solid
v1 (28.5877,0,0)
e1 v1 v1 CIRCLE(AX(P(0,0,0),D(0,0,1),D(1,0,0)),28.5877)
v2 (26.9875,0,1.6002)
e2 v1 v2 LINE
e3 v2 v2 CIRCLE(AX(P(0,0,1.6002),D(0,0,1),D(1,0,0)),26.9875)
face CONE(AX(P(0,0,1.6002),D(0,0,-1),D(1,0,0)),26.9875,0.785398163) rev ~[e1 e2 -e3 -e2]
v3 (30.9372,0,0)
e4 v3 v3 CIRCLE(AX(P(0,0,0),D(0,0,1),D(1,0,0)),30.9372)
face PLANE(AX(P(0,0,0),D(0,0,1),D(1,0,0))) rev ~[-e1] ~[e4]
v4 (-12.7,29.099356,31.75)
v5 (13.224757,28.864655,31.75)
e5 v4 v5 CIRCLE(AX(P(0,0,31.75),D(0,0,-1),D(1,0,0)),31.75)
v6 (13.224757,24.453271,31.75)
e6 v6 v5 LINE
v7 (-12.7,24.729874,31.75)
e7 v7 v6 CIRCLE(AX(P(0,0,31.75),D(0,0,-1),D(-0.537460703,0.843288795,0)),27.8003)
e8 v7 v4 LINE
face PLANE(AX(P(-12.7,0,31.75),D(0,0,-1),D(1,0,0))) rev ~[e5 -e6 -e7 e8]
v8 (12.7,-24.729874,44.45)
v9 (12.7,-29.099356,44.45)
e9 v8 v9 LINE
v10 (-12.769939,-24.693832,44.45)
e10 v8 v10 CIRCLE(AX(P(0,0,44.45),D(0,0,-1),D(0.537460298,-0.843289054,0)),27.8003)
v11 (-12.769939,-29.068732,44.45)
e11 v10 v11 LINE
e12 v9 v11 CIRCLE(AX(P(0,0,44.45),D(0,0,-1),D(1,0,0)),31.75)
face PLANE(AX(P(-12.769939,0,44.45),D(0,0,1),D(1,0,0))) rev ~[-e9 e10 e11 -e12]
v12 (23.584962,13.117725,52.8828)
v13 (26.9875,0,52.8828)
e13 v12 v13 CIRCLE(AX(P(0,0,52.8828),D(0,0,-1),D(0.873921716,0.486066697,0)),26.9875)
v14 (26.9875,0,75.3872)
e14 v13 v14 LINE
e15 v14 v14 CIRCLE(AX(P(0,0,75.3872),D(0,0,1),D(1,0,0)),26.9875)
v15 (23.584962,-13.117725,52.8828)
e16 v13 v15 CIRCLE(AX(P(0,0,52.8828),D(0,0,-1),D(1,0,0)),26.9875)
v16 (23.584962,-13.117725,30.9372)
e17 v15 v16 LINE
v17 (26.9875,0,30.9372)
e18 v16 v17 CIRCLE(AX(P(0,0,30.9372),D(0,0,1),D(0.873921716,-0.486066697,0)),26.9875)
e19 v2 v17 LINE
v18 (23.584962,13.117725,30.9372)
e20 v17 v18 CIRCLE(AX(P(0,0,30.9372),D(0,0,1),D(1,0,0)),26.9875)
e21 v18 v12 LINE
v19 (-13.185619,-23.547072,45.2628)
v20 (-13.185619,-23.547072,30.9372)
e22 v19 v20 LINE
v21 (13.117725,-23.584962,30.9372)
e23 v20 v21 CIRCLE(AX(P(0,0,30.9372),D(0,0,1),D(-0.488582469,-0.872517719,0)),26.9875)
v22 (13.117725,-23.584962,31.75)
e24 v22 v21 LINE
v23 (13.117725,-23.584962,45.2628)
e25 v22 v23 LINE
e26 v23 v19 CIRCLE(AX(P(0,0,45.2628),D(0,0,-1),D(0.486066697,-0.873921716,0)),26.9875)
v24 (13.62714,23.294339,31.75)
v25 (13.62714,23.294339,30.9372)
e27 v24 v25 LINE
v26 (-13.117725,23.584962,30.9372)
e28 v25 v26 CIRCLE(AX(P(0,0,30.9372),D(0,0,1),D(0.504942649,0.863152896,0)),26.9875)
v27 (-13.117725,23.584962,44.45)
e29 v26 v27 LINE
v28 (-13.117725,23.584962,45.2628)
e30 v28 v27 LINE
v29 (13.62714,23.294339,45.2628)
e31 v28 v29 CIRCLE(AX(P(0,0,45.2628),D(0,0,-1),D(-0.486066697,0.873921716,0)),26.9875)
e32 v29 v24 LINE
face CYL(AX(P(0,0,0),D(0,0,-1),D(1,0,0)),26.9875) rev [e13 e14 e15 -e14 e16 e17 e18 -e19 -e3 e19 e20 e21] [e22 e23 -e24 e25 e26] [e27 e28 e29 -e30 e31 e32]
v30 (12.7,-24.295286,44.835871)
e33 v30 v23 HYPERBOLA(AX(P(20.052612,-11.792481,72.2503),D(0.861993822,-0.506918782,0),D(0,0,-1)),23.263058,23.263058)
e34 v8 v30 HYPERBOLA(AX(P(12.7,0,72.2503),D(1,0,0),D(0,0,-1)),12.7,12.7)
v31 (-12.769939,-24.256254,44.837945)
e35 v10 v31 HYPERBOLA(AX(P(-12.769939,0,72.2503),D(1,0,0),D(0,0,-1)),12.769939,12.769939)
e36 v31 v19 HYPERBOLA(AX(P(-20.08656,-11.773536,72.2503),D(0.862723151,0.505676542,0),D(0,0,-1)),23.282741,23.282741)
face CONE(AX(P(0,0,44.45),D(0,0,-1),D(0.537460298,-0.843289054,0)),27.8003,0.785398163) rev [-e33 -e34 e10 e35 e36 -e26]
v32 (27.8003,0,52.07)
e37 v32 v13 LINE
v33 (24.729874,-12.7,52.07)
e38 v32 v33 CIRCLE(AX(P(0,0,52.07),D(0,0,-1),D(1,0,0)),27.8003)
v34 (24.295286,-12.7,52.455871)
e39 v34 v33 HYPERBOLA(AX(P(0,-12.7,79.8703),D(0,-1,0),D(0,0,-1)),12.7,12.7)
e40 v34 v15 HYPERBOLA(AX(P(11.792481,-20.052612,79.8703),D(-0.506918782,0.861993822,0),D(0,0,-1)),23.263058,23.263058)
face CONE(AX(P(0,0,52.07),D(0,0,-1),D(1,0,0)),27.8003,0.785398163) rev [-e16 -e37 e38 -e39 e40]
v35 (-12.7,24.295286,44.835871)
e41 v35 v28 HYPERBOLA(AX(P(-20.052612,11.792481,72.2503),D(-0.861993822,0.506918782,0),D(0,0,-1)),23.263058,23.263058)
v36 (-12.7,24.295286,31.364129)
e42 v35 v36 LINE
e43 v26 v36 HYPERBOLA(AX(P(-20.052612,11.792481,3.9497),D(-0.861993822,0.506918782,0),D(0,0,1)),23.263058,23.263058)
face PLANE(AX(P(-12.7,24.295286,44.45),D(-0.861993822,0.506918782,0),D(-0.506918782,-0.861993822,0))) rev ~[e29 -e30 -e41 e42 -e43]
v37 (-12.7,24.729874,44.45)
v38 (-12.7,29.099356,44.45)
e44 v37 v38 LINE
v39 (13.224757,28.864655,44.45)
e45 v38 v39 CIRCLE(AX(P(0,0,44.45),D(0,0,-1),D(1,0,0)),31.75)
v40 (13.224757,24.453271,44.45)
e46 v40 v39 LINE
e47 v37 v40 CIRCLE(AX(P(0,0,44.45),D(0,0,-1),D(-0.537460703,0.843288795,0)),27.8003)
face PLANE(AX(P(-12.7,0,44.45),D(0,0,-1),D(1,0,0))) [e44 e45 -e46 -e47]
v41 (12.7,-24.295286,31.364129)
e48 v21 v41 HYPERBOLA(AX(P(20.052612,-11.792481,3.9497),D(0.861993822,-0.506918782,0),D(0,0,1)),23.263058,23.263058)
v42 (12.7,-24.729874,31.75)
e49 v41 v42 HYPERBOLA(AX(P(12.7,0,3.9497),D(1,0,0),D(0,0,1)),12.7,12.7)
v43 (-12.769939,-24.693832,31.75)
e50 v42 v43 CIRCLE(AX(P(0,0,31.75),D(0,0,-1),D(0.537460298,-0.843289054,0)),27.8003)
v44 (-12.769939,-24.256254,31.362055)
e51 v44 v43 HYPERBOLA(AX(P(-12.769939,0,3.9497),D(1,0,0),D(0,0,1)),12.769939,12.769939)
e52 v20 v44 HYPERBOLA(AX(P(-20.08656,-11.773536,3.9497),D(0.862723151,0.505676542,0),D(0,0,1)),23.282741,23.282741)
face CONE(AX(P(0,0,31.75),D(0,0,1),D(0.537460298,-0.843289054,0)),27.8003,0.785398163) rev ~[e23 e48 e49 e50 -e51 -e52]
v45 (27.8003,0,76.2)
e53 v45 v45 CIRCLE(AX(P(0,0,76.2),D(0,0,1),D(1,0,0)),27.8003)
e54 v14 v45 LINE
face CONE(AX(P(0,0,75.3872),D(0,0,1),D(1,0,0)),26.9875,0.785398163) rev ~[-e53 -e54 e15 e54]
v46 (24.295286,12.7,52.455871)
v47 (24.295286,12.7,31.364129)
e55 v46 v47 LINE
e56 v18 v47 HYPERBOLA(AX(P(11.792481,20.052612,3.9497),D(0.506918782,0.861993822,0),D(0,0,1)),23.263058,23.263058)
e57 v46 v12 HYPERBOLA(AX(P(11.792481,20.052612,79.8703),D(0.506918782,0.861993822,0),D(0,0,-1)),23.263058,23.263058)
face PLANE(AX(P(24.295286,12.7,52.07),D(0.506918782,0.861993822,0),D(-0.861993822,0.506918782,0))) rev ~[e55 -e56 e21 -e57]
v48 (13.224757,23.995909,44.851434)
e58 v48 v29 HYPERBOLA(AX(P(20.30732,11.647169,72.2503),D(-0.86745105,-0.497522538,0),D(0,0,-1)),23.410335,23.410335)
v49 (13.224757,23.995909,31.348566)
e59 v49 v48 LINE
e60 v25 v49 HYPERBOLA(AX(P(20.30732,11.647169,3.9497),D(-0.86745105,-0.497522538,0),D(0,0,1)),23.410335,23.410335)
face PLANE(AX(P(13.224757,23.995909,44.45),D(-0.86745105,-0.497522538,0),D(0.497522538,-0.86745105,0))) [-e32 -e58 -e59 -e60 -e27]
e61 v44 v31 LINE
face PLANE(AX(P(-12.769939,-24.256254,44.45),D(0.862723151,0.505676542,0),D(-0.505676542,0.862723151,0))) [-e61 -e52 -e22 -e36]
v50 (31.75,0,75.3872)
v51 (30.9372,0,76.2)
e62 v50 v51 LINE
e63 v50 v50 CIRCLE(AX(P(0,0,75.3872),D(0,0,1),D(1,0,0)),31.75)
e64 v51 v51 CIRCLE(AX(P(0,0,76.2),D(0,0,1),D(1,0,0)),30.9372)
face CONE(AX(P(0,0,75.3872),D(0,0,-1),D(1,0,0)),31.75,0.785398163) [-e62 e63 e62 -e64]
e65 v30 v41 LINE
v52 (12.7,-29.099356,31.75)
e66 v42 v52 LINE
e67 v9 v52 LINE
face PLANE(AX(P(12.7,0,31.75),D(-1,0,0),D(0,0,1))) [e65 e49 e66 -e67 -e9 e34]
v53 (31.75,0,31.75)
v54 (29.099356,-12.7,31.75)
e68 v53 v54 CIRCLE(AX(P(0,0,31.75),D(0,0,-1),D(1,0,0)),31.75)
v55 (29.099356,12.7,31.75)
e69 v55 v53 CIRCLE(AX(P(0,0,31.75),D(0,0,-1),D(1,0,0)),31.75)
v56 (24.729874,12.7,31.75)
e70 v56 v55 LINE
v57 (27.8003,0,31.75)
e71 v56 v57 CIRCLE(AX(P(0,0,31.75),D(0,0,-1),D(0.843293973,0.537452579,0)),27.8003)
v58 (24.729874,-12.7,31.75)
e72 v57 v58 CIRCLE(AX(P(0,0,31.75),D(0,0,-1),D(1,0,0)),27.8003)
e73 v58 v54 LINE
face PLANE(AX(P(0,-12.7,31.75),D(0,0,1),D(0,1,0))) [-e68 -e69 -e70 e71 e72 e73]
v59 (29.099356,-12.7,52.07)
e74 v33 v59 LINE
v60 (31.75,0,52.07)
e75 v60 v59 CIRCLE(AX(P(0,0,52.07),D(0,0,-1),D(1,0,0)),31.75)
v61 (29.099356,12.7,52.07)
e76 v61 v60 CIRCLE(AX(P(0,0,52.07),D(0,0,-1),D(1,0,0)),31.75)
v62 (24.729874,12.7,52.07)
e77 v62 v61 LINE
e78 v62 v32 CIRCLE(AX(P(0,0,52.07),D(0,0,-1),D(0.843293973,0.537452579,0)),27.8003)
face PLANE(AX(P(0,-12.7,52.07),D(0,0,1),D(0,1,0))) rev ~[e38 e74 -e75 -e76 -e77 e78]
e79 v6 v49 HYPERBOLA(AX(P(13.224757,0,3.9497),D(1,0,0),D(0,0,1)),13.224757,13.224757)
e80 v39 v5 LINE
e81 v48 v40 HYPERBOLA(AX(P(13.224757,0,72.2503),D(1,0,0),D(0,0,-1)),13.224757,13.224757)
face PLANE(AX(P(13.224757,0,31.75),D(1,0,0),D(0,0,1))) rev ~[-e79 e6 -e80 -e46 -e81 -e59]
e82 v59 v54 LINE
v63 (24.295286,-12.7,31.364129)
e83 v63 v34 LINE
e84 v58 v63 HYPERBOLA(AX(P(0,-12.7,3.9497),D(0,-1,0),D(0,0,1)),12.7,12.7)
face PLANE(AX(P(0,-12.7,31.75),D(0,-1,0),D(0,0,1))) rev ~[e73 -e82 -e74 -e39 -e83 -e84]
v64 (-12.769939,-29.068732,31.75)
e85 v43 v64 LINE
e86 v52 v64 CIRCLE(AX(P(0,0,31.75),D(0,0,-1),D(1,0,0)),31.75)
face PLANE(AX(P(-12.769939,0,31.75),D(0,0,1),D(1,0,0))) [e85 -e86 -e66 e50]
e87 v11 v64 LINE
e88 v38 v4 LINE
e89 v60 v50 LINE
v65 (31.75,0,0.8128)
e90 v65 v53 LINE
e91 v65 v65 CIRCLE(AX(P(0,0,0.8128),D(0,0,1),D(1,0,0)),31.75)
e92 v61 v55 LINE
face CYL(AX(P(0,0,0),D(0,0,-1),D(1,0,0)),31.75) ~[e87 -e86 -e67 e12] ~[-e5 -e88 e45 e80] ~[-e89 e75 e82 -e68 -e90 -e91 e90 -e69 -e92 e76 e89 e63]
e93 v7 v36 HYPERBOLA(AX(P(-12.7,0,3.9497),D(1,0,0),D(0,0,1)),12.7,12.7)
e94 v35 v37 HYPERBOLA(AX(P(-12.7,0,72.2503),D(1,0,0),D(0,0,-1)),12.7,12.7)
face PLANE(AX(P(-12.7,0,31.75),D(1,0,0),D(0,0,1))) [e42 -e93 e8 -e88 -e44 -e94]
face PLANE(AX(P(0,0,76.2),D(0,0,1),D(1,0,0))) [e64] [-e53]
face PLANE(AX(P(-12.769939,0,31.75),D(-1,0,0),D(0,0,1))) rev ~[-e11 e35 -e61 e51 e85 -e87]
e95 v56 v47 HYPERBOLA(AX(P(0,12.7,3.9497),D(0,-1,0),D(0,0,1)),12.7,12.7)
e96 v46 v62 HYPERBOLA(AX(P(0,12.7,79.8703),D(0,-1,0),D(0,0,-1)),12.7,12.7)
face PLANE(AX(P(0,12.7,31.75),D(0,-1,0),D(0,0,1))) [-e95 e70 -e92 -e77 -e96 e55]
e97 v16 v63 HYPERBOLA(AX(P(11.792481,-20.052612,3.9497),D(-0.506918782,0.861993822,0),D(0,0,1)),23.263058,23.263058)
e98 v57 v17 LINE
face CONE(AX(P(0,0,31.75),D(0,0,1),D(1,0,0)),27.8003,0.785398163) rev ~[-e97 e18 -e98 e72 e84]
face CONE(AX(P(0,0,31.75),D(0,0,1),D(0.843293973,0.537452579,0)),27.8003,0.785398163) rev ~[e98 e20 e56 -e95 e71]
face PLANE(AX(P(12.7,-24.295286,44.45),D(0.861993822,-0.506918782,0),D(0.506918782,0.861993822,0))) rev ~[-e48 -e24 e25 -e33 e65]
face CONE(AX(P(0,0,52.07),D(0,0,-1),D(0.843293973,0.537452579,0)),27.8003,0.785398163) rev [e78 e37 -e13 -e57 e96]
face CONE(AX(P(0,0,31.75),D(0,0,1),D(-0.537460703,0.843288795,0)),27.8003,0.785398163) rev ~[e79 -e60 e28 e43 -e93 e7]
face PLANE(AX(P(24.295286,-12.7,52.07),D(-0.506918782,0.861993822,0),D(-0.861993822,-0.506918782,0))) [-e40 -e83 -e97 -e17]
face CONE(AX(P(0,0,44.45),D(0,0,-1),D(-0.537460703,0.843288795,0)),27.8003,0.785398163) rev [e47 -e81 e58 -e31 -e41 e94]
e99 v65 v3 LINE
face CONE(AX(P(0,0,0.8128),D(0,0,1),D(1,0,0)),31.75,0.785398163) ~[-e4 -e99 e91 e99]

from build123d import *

# Parameters (mm, degrees)
F0_R          = 31.75
F0_R_2        = 26.9875
F1_DEPTH      = 76.2
F2_W          = 25.924757123
F2_H          = 12.7
F3_DEPTH      = 76.2
F4_W          = 25.4699392244
F4_H          = 12.7
F5_DEPTH      = 76.2
F6_W          = 25.4
F6_H          = 20.32
F7_DEPTH      = 76.2
F8_T1_DEPTH   = 20.32
F8_T3_DEPTH   = 12.7
F8_T8_ANGLE   = 32.5103926672
F8_T13_ANGLE  = 32.5103926672
F8_T18_ANGLE  = 32.5103926672
F8_T23_ANGLE  = 32.5103926672
F8_T28_ANGLE  = 66.292132353
F8_T34_ANGLE  = 66.292132353
F8_T40_ANGLE  = 65.190248715
F8_T46_ANGLE  = 65.190248715
F8_T53_ANGLE  = 32.5103926672
F8_T57_DEPTH  = 21.5976920802
F8_T64_ANGLE  = 32.5103926672
F8_T68_DEPTH  = 21.5976920802
F8_T75_ANGLE  = 32.5103926672
F8_T79_DEPTH  = 21.5976920802
F8_T86_DEPTH  = 21.5976920802
F8_T90_ANGLE  = 32.5103926672
F8_T97_ANGLE  = 66.292132353
F8_T101_DEPTH = 13.9481520643
F8_T108_ANGLE = 66.292132353
F8_T112_DEPTH = 13.9481520643
F8_T119_DEPTH = 13.9776920802
F8_T123_ANGLE = 66.292132353
F8_T130_DEPTH = 13.9776920802
F8_T134_ANGLE = 66.292132353
F8_T141_DEPTH = 13.9776920802
F8_T145_ANGLE = 65.190248715
F8_T152_DEPTH = 13.9776920802
F8_T156_ANGLE = 65.190248715
F8_T163_ANGLE = 65.190248715
F8_T167_DEPTH = 13.9737539479
F8_T174_ANGLE = 65.190248715
F8_T178_DEPTH = 13.9737539479
F9_SIZE       = 0.8128
F10_SIZE      = 1.6002


# Not quite as in the source:
# - a fillet or chamfer that OpenCascade refuses, or shapes differently, is made with other operations: its cross-section is extruded or revolved along the edge and cut away or added


with BuildPart() as f1:
    # F0 (on Top) → F1 (new body)
    with BuildSketch(Plane.XY):
        Circle(F0_R)
        Circle(F0_R_2, mode=Mode.SUBTRACT)
    extrude(amount=F1_DEPTH)

    # F2 (on Front) → F3 (cut)
    with BuildSketch(Plane.XZ):
        with Locations((0.2623785615, 38.1)):
            Rectangle(F2_W, F2_H)
    extrude(amount=-F3_DEPTH, mode=Mode.SUBTRACT)

    # F4 (on Front) → F5 (cut)
    with BuildSketch(Plane.XZ):
        with Locations((-0.0349696122, 38.1)):
            Rectangle(F4_W, F4_H)
    extrude(amount=F5_DEPTH, mode=Mode.SUBTRACT)

    # F6 (on Right) → F7 (cut)
    with BuildSketch(Plane.YZ):
        with Locations((0, 41.91)):
            Rectangle(F6_W, F6_H)
    extrude(amount=F7_DEPTH, mode=Mode.SUBTRACT)

    # F8: chamfer of 0.8128 on 14 edges, made by hand

    # F8_s2 → F8_t1 (cut)
    with BuildSketch(Plane.XY.offset(31.75)):
        with BuildLine():
            Line((24.2952858853, 12.7), (23.5849623144, 13.1177249886))
            ThreePointArc((23.5849623144, 13.1177249886), (23.6929781684, 12.9216075532), (23.8125, 12.7))
            Line((23.8125, 12.7), (24.2952858853, 12.7))
        make_face()
        with BuildLine():
            Line((24.2952858853, -12.7), (23.5849623144, -13.1177249886))
            ThreePointArc((23.5849623144, -13.1177249886), (23.6929781684, -12.9216075532), (23.8125, -12.7))
            Line((23.8125, -12.7), (24.2952858853, -12.7))
        make_face()
    extrude(amount=F8_T1_DEPTH, mode=Mode.SUBTRACT)

    # F8_s4 → F8_t3 (cut)
    with BuildSketch(Plane.XY.offset(31.75)):
        with BuildLine():
            Line((13.224757123, 23.9959094453), (13.6271397379, 23.2943387717))
            ThreePointArc((13.6271397379, 23.2943387717), (13.4386181576, 23.4036043862), (13.224757123, 23.5251132896))
            Line((13.224757123, 23.5251132896), (13.224757123, 23.9959094453))
        make_face()
        with BuildLine():
            Line((-12.7, 24.2952858853), (-13.1177249886, 23.5849623144))
            ThreePointArc((-13.1177249886, 23.5849623144), (-12.9216075532, 23.6929781684), (-12.7, 23.8125))
            Line((-12.7, 23.8125), (-12.7, 24.2952858853))
        make_face()
        with BuildLine():
            Line((12.7, -24.2952858853), (13.1177249886, -23.5849623144))
            ThreePointArc((13.1177249886, -23.5849623144), (12.9216075532, -23.6929781684), (12.7, -23.8125))
            Line((12.7, -23.8125), (12.7, -24.2952858853))
        make_face()
        with BuildLine():
            Line((-12.7699392244, -24.2562543533), (-13.1856193933, -23.547071951))
            ThreePointArc((-13.1856193933, -23.547071951), (-12.9905149919, -23.6552674154), (-12.7699392244, -23.7750669495))
            Line((-12.7699392244, -23.7750669495), (-12.7699392244, -24.2562543533))
        make_face()
    extrude(amount=F8_T3_DEPTH, mode=Mode.SUBTRACT)


with BuildPart() as f8_tool6:
    # F8_s7 → F8_t8 (revolve)
    with BuildSketch(Plane.XZ):
        Polygon((27.8003, 31.75), (26.9875, 30.9372), (26.9875, 31.75), align=None)
    revolve(axis=Axis((0, 0, 31.75), (0, 0, -1)), revolution_arc=F8_T8_ANGLE)

    split(bisect_by=Plane.XZ.offset(12.7), keep=Keep.BOTTOM)


with BuildPart() as f1_1:
    add(f1.part)

    # F8_t5: cut F8_tool6
    add(f8_tool6.part, mode=Mode.SUBTRACT)


with BuildPart() as f8_tool11:
    # F8_s12 → F8_t13 (revolve)
    with BuildSketch(Plane(origin=(0, 0, 0), x_dir=(0, 0, 1), z_dir=(-0.5374525791, 0.8432939732, 0))):
        Polygon((31.75, 27.8003), (30.9372, 26.9875), (31.75, 26.9875), align=None)
    revolve(axis=Axis((0, 0, 31.75), (0, 0, -1)), revolution_arc=F8_T13_ANGLE)

    split(bisect_by=Plane.XZ.offset(-12.7), keep=Keep.TOP)


with BuildPart() as f1_2:
    add(f1_1.part)

    # F8_t10: cut F8_tool11
    add(f8_tool11.part, mode=Mode.SUBTRACT)


with BuildPart() as f8_tool16:
    # F8_s17 → F8_t18 (revolve)
    with BuildSketch(Plane.XZ):
        Polygon((27.8003, 52.07), (26.9875, 52.8828), (26.9875, 52.07), align=None)
    revolve(axis=Axis((0, 0, 52.07), (0, 0, -1)), revolution_arc=F8_T18_ANGLE)

    split(bisect_by=Plane.XZ.offset(12.7), keep=Keep.BOTTOM)


with BuildPart() as f1_3:
    add(f1_2.part)

    # F8_t15: cut F8_tool16
    add(f8_tool16.part, mode=Mode.SUBTRACT)


with BuildPart() as f8_tool21:
    # F8_s22 → F8_t23 (revolve)
    with BuildSketch(Plane(origin=(0, 0, 0), x_dir=(0, 0, 1), z_dir=(-0.5374525791, 0.8432939732, 0))):
        Polygon((52.07, 27.8003), (52.8828, 26.9875), (52.07, 26.9875), align=None)
    revolve(axis=Axis((0, 0, 52.07), (0, 0, -1)), revolution_arc=F8_T23_ANGLE)

    split(bisect_by=Plane.XZ.offset(-12.7), keep=Keep.TOP)


with BuildPart() as f1_4:
    add(f1_3.part)

    # F8_t20: cut F8_tool21
    add(f8_tool21.part, mode=Mode.SUBTRACT)


with BuildPart() as f8_tool26:
    # F8_s27 → F8_t28 (revolve)
    with BuildSketch(Plane(origin=(0, 0, 0), x_dir=(0, 0, 1), z_dir=(-0.8432887953, -0.5374607034, 0))):
        Polygon((31.75, 27.8003), (30.9372, 26.9875), (31.75, 26.9875), align=None)
    revolve(axis=Axis((0, 0, 31.75), (0, 0, -1)), revolution_arc=F8_T28_ANGLE)

    split(bisect_by=Plane.YZ.offset(-12.7), keep=Keep.TOP)

    split(bisect_by=Plane.YZ.offset(13.224757123), keep=Keep.BOTTOM)


with BuildPart() as f1_5:
    add(f1_4.part)

    # F8_t25: cut F8_tool26
    add(f8_tool26.part, mode=Mode.SUBTRACT)


with BuildPart() as f8_tool32:
    # F8_s33 → F8_t34 (revolve)
    with BuildSketch(Plane(origin=(0, 0, 0), x_dir=(0, 0, 1), z_dir=(-0.8432887953, -0.5374607034, 0))):
        Polygon((44.45, 27.8003), (45.2628, 26.9875), (44.45, 26.9875), align=None)
    revolve(axis=Axis((0, 0, 44.45), (0, 0, -1)), revolution_arc=F8_T34_ANGLE)

    split(bisect_by=Plane.YZ.offset(-12.7), keep=Keep.TOP)

    split(bisect_by=Plane.YZ.offset(13.224757123), keep=Keep.BOTTOM)


with BuildPart() as f1_6:
    add(f1_5.part)

    # F8_t31: cut F8_tool32
    add(f8_tool32.part, mode=Mode.SUBTRACT)


with BuildPart() as f8_tool38:
    # F8_s39 → F8_t40 (revolve)
    with BuildSketch(Plane(origin=(0, 0, 0), x_dir=(0, 0, 1), z_dir=(0.843289054, 0.5374602975, 0))):
        Polygon((31.75, 27.8003), (30.9372, 26.9875), (31.75, 26.9875), align=None)
    revolve(axis=Axis((0, 0, 31.75), (0, 0, -1)), revolution_arc=F8_T40_ANGLE)

    split(bisect_by=Plane.YZ.offset(12.7), keep=Keep.BOTTOM)

    split(bisect_by=Plane.YZ.offset(-12.7699392244), keep=Keep.TOP)


with BuildPart() as f1_7:
    add(f1_6.part)

    # F8_t37: cut F8_tool38
    add(f8_tool38.part, mode=Mode.SUBTRACT)


with BuildPart() as f8_tool44:
    # F8_s45 → F8_t46 (revolve)
    with BuildSketch(Plane(origin=(0, 0, 0), x_dir=(0, 0, 1), z_dir=(0.843289054, 0.5374602975, 0))):
        Polygon((44.45, 27.8003), (45.2628, 26.9875), (44.45, 26.9875), align=None)
    revolve(axis=Axis((0, 0, 44.45), (0, 0, -1)), revolution_arc=F8_T46_ANGLE)

    split(bisect_by=Plane.YZ.offset(12.7), keep=Keep.BOTTOM)

    split(bisect_by=Plane.YZ.offset(-12.7699392244), keep=Keep.TOP)


with BuildPart() as f1_8:
    add(f1_7.part)

    # F8_t43: cut F8_tool44
    add(f8_tool44.part, mode=Mode.SUBTRACT)


with BuildPart() as f8_tool51:
    # F8_s52 → F8_t53 (revolve)
    with BuildSketch(Plane.XZ):
        Polygon((27.8003, 31.75), (26.9875, 30.9372), (26.9875, 31.75), align=None)
    revolve(axis=Axis((0, 0, 31.75), (0, 0, -1)), revolution_arc=F8_T53_ANGLE)

    split(bisect_by=Plane.XZ.offset(12.7), keep=Keep.TOP)


with BuildPart() as f8_tool55:
    # F8_s56 → F8_t57 (new body)
    with BuildSketch(Plane.XY.offset(52.07)):
        with BuildLine():
            Line((24.2952858853, -12.7), (23.5849623144, -13.1177249886))
            ThreePointArc((23.5849623144, -13.1177249886), (23.6929781684, -12.9216075532), (23.8125, -12.7))
            Line((23.8125, -12.7), (24.2952858853, -12.7))
        make_face()
    extrude(amount=-F8_T57_DEPTH)

    split(bisect_by=Plane.XY.offset(31.75), keep=Keep.BOTTOM)


with BuildPart() as f8_tool51_1:
    add(f8_tool51.part)

    # F8_t59: intersect F8_tool55
    add(f8_tool55.part, mode=Mode.INTERSECT)


with BuildPart() as f1_9:
    add(f1_8.part)

    # F8_t49: cut F8_tool51
    add(f8_tool51_1.part, mode=Mode.SUBTRACT)


with BuildPart() as f8_tool62:
    # F8_s63 → F8_t64 (revolve)
    with BuildSketch(Plane(origin=(0, 0, 0), x_dir=(0, 0, 1), z_dir=(-0.5374525791, 0.8432939732, 0))):
        Polygon((31.75, 27.8003), (30.9372, 26.9875), (31.75, 26.9875), align=None)
    revolve(axis=Axis((0, 0, 31.75), (0, 0, -1)), revolution_arc=F8_T64_ANGLE)

    split(bisect_by=Plane.XZ.offset(-12.7), keep=Keep.BOTTOM)


with BuildPart() as f8_tool66:
    # F8_s67 → F8_t68 (new body)
    with BuildSketch(Plane.XY.offset(52.07)):
        with BuildLine():
            Line((24.2952858853, 12.7), (23.5849623144, 13.1177249886))
            ThreePointArc((23.5849623144, 13.1177249886), (23.6929781684, 12.9216075532), (23.8125, 12.7))
            Line((23.8125, 12.7), (24.2952858853, 12.7))
        make_face()
    extrude(amount=-F8_T68_DEPTH)

    split(bisect_by=Plane.XY.offset(31.75), keep=Keep.BOTTOM)


with BuildPart() as f8_tool62_1:
    add(f8_tool62.part)

    # F8_t70: intersect F8_tool66
    add(f8_tool66.part, mode=Mode.INTERSECT)


with BuildPart() as f1_10:
    add(f1_9.part)

    # F8_t60: cut F8_tool62
    add(f8_tool62_1.part, mode=Mode.SUBTRACT)


with BuildPart() as f8_tool73:
    # F8_s74 → F8_t75 (revolve)
    with BuildSketch(Plane(origin=(0, 0, 0), x_dir=(0, 0, 1), z_dir=(-0.5374525791, 0.8432939732, 0))):
        Polygon((52.07, 27.8003), (52.8828, 26.9875), (52.07, 26.9875), align=None)
    revolve(axis=Axis((0, 0, 52.07), (0, 0, -1)), revolution_arc=F8_T75_ANGLE)

    split(bisect_by=Plane.XZ.offset(-12.7), keep=Keep.BOTTOM)


with BuildPart() as f8_tool77:
    # F8_s78 → F8_t79 (new body)
    with BuildSketch(Plane.XY.offset(53.3476920802)):
        with BuildLine():
            Line((24.2952858853, 12.7), (23.5849623144, 13.1177249886))
            ThreePointArc((23.5849623144, 13.1177249886), (23.6929781684, 12.9216075532), (23.8125, 12.7))
            Line((23.8125, 12.7), (24.2952858853, 12.7))
        make_face()
    extrude(amount=-F8_T79_DEPTH)

    split(bisect_by=Plane.XY.offset(52.07), keep=Keep.TOP)


with BuildPart() as f8_tool73_1:
    add(f8_tool73.part)

    # F8_t81: intersect F8_tool77
    add(f8_tool77.part, mode=Mode.INTERSECT)


with BuildPart() as f1_11:
    add(f1_10.part)

    # F8_t71: cut F8_tool73
    add(f8_tool73_1.part, mode=Mode.SUBTRACT)


with BuildPart() as f8_tool84:
    # F8_s85 → F8_t86 (new body)
    with BuildSketch(Plane.XY.offset(53.3476920802)):
        with BuildLine():
            Line((24.2952858853, -12.7), (23.5849623144, -13.1177249886))
            ThreePointArc((23.5849623144, -13.1177249886), (23.6929781684, -12.9216075532), (23.8125, -12.7))
            Line((23.8125, -12.7), (24.2952858853, -12.7))
        make_face()
    extrude(amount=-F8_T86_DEPTH)

    split(bisect_by=Plane.XY.offset(52.07), keep=Keep.TOP)


with BuildPart() as f8_tool88:
    # F8_s89 → F8_t90 (revolve)
    with BuildSketch(Plane.XZ):
        Polygon((27.8003, 52.07), (26.9875, 52.8828), (26.9875, 52.07), align=None)
    revolve(axis=Axis((0, 0, 52.07), (0, 0, -1)), revolution_arc=F8_T90_ANGLE)

    split(bisect_by=Plane.XZ.offset(12.7), keep=Keep.TOP)


with BuildPart() as f8_tool84_1:
    add(f8_tool84.part)

    # F8_t92: intersect F8_tool88
    add(f8_tool88.part, mode=Mode.INTERSECT)


with BuildPart() as f1_12:
    add(f1_11.part)

    # F8_t82: cut F8_tool84
    add(f8_tool84_1.part, mode=Mode.SUBTRACT)


with BuildPart() as f8_tool95:
    # F8_s96 → F8_t97 (revolve)
    with BuildSketch(Plane(origin=(0, 0, 0), x_dir=(0, 0, 1), z_dir=(-0.8432887953, -0.5374607034, 0))):
        Polygon((44.45, 27.8003), (45.2628, 26.9875), (44.45, 26.9875), align=None)
    revolve(axis=Axis((0, 0, 44.45), (0, 0, -1)), revolution_arc=F8_T97_ANGLE)

    split(bisect_by=Plane.YZ.offset(13.224757123), keep=Keep.TOP)


with BuildPart() as f8_tool99:
    # F8_s100 → F8_t101 (new body)
    with BuildSketch(Plane.XY.offset(45.6981520643)):
        with BuildLine():
            Line((13.224757123, 23.9959094453), (13.6271397379, 23.2943387717))
            ThreePointArc((13.6271397379, 23.2943387717), (13.4386181576, 23.4036043862), (13.224757123, 23.5251132896))
            Line((13.224757123, 23.5251132896), (13.224757123, 23.9959094453))
        make_face()
    extrude(amount=-F8_T101_DEPTH)

    split(bisect_by=Plane.XY.offset(44.45), keep=Keep.TOP)


with BuildPart() as f8_tool95_1:
    add(f8_tool95.part)

    # F8_t103: intersect F8_tool99
    add(f8_tool99.part, mode=Mode.INTERSECT)


with BuildPart() as f1_13:
    add(f1_12.part)

    # F8_t93: cut F8_tool95
    add(f8_tool95_1.part, mode=Mode.SUBTRACT)


with BuildPart() as f8_tool106:
    # F8_s107 → F8_t108 (revolve)
    with BuildSketch(Plane(origin=(0, 0, 0), x_dir=(0, 0, 1), z_dir=(-0.8432887953, -0.5374607034, 0))):
        Polygon((31.75, 27.8003), (30.9372, 26.9875), (31.75, 26.9875), align=None)
    revolve(axis=Axis((0, 0, 31.75), (0, 0, -1)), revolution_arc=F8_T108_ANGLE)

    split(bisect_by=Plane.YZ.offset(13.224757123), keep=Keep.TOP)


with BuildPart() as f8_tool110:
    # F8_s111 → F8_t112 (new body)
    with BuildSketch(Plane.XY.offset(44.45)):
        with BuildLine():
            Line((13.224757123, 23.9959094453), (13.6271397379, 23.2943387717))
            ThreePointArc((13.6271397379, 23.2943387717), (13.4386181576, 23.4036043862), (13.224757123, 23.5251132896))
            Line((13.224757123, 23.5251132896), (13.224757123, 23.9959094453))
        make_face()
    extrude(amount=-F8_T112_DEPTH)

    split(bisect_by=Plane.XY.offset(31.75), keep=Keep.BOTTOM)


with BuildPart() as f8_tool106_1:
    add(f8_tool106.part)

    # F8_t114: intersect F8_tool110
    add(f8_tool110.part, mode=Mode.INTERSECT)


with BuildPart() as f1_14:
    add(f1_13.part)

    # F8_t104: cut F8_tool106
    add(f8_tool106_1.part, mode=Mode.SUBTRACT)


with BuildPart() as f8_tool117:
    # F8_s118 → F8_t119 (new body)
    with BuildSketch(Plane.XY.offset(44.45)):
        with BuildLine():
            Line((-12.7, 24.2952858853), (-13.1177249886, 23.5849623144))
            ThreePointArc((-13.1177249886, 23.5849623144), (-12.9216075532, 23.6929781684), (-12.7, 23.8125))
            Line((-12.7, 23.8125), (-12.7, 24.2952858853))
        make_face()
    extrude(amount=-F8_T119_DEPTH)

    split(bisect_by=Plane.XY.offset(31.75), keep=Keep.BOTTOM)


with BuildPart() as f8_tool121:
    # F8_s122 → F8_t123 (revolve)
    with BuildSketch(Plane(origin=(0, 0, 0), x_dir=(0, 0, 1), z_dir=(-0.8432887953, -0.5374607034, 0))):
        Polygon((31.75, 27.8003), (30.9372, 26.9875), (31.75, 26.9875), align=None)
    revolve(axis=Axis((0, 0, 31.75), (0, 0, -1)), revolution_arc=F8_T123_ANGLE)

    split(bisect_by=Plane.YZ.offset(-12.7), keep=Keep.BOTTOM)


with BuildPart() as f8_tool117_1:
    add(f8_tool117.part)

    # F8_t125: intersect F8_tool121
    add(f8_tool121.part, mode=Mode.INTERSECT)


with BuildPart() as f1_15:
    add(f1_14.part)

    # F8_t115: cut F8_tool117
    add(f8_tool117_1.part, mode=Mode.SUBTRACT)


with BuildPart() as f8_tool128:
    # F8_s129 → F8_t130 (new body)
    with BuildSketch(Plane.XY.offset(45.7276920802)):
        with BuildLine():
            Line((-12.7, 24.2952858853), (-13.1177249886, 23.5849623144))
            ThreePointArc((-13.1177249886, 23.5849623144), (-12.9216075532, 23.6929781684), (-12.7, 23.8125))
            Line((-12.7, 23.8125), (-12.7, 24.2952858853))
        make_face()
    extrude(amount=-F8_T130_DEPTH)

    split(bisect_by=Plane.XY.offset(44.45), keep=Keep.TOP)


with BuildPart() as f8_tool132:
    # F8_s133 → F8_t134 (revolve)
    with BuildSketch(Plane(origin=(0, 0, 0), x_dir=(0, 0, 1), z_dir=(-0.8432887953, -0.5374607034, 0))):
        Polygon((44.45, 27.8003), (45.2628, 26.9875), (44.45, 26.9875), align=None)
    revolve(axis=Axis((0, 0, 44.45), (0, 0, -1)), revolution_arc=F8_T134_ANGLE)

    split(bisect_by=Plane.YZ.offset(-12.7), keep=Keep.BOTTOM)


with BuildPart() as f8_tool128_1:
    add(f8_tool128.part)

    # F8_t136: intersect F8_tool132
    add(f8_tool132.part, mode=Mode.INTERSECT)


with BuildPart() as f1_16:
    add(f1_15.part)

    # F8_t126: cut F8_tool128
    add(f8_tool128_1.part, mode=Mode.SUBTRACT)


with BuildPart() as f8_tool139:
    # F8_s140 → F8_t141 (new body)
    with BuildSketch(Plane.XY.offset(45.7276920802)):
        with BuildLine():
            Line((12.7, -24.2952858853), (13.1177249886, -23.5849623144))
            ThreePointArc((13.1177249886, -23.5849623144), (12.9216075532, -23.6929781684), (12.7, -23.8125))
            Line((12.7, -23.8125), (12.7, -24.2952858853))
        make_face()
    extrude(amount=-F8_T141_DEPTH)

    split(bisect_by=Plane.XY.offset(44.45), keep=Keep.TOP)


with BuildPart() as f8_tool143:
    # F8_s144 → F8_t145 (revolve)
    with BuildSketch(Plane(origin=(0, 0, 0), x_dir=(0, 0, 1), z_dir=(0.843289054, 0.5374602975, 0))):
        Polygon((44.45, 27.8003), (45.2628, 26.9875), (44.45, 26.9875), align=None)
    revolve(axis=Axis((0, 0, 44.45), (0, 0, -1)), revolution_arc=F8_T145_ANGLE)

    split(bisect_by=Plane.YZ.offset(12.7), keep=Keep.TOP)


with BuildPart() as f8_tool139_1:
    add(f8_tool139.part)

    # F8_t147: intersect F8_tool143
    add(f8_tool143.part, mode=Mode.INTERSECT)


with BuildPart() as f1_17:
    add(f1_16.part)

    # F8_t137: cut F8_tool139
    add(f8_tool139_1.part, mode=Mode.SUBTRACT)


with BuildPart() as f8_tool150:
    # F8_s151 → F8_t152 (new body)
    with BuildSketch(Plane.XY.offset(44.45)):
        with BuildLine():
            Line((12.7, -24.2952858853), (13.1177249886, -23.5849623144))
            ThreePointArc((13.1177249886, -23.5849623144), (12.9216075532, -23.6929781684), (12.7, -23.8125))
            Line((12.7, -23.8125), (12.7, -24.2952858853))
        make_face()
    extrude(amount=-F8_T152_DEPTH)

    split(bisect_by=Plane.XY.offset(31.75), keep=Keep.BOTTOM)


with BuildPart() as f8_tool154:
    # F8_s155 → F8_t156 (revolve)
    with BuildSketch(Plane(origin=(0, 0, 0), x_dir=(0, 0, 1), z_dir=(0.843289054, 0.5374602975, 0))):
        Polygon((31.75, 27.8003), (30.9372, 26.9875), (31.75, 26.9875), align=None)
    revolve(axis=Axis((0, 0, 31.75), (0, 0, -1)), revolution_arc=F8_T156_ANGLE)

    split(bisect_by=Plane.YZ.offset(12.7), keep=Keep.TOP)


with BuildPart() as f8_tool150_1:
    add(f8_tool150.part)

    # F8_t158: intersect F8_tool154
    add(f8_tool154.part, mode=Mode.INTERSECT)


with BuildPart() as f1_18:
    add(f1_17.part)

    # F8_t148: cut F8_tool150
    add(f8_tool150_1.part, mode=Mode.SUBTRACT)


with BuildPart() as f8_tool161:
    # F8_s162 → F8_t163 (revolve)
    with BuildSketch(Plane(origin=(0, 0, 0), x_dir=(0, 0, 1), z_dir=(0.843289054, 0.5374602975, 0))):
        Polygon((44.45, 27.8003), (45.2628, 26.9875), (44.45, 26.9875), align=None)
    revolve(axis=Axis((0, 0, 44.45), (0, 0, -1)), revolution_arc=F8_T163_ANGLE)

    split(bisect_by=Plane.YZ.offset(-12.7699392244), keep=Keep.BOTTOM)


with BuildPart() as f8_tool165:
    # F8_s166 → F8_t167 (new body)
    with BuildSketch(Plane.XY.offset(45.7237539479)):
        with BuildLine():
            Line((-12.7699392244, -24.2562543533), (-13.1856193933, -23.547071951))
            ThreePointArc((-13.1856193933, -23.547071951), (-12.9905149919, -23.6552674154), (-12.7699392244, -23.7750669495))
            Line((-12.7699392244, -23.7750669495), (-12.7699392244, -24.2562543533))
        make_face()
    extrude(amount=-F8_T167_DEPTH)

    split(bisect_by=Plane.XY.offset(44.45), keep=Keep.TOP)


with BuildPart() as f8_tool161_1:
    add(f8_tool161.part)

    # F8_t169: intersect F8_tool165
    add(f8_tool165.part, mode=Mode.INTERSECT)


with BuildPart() as f1_19:
    add(f1_18.part)

    # F8_t159: cut F8_tool161
    add(f8_tool161_1.part, mode=Mode.SUBTRACT)


with BuildPart() as f8_tool172:
    # F8_s173 → F8_t174 (revolve)
    with BuildSketch(Plane(origin=(0, 0, 0), x_dir=(0, 0, 1), z_dir=(0.843289054, 0.5374602975, 0))):
        Polygon((31.75, 27.8003), (30.9372, 26.9875), (31.75, 26.9875), align=None)
    revolve(axis=Axis((0, 0, 31.75), (0, 0, -1)), revolution_arc=F8_T174_ANGLE)

    split(bisect_by=Plane.YZ.offset(-12.7699392244), keep=Keep.BOTTOM)


with BuildPart() as f8_tool176:
    # F8_s177 → F8_t178 (new body)
    with BuildSketch(Plane.XY.offset(44.45)):
        with BuildLine():
            Line((-12.7699392244, -24.2562543533), (-13.1856193933, -23.547071951))
            ThreePointArc((-13.1856193933, -23.547071951), (-12.9905149919, -23.6552674154), (-12.7699392244, -23.7750669495))
            Line((-12.7699392244, -23.7750669495), (-12.7699392244, -24.2562543533))
        make_face()
    extrude(amount=-F8_T178_DEPTH)

    split(bisect_by=Plane.XY.offset(31.75), keep=Keep.BOTTOM)


with BuildPart() as f8_tool172_1:
    add(f8_tool172.part)

    # F8_t180: intersect F8_tool176
    add(f8_tool176.part, mode=Mode.INTERSECT)


with BuildPart() as f1_20:
    add(f1_19.part)

    # F8_t170: cut F8_tool172
    add(f8_tool172_1.part, mode=Mode.SUBTRACT)

    # F9
    f9_edges = [f1_20.edges().sort_by_distance(p)[0] for p in [
        (-26.9875, 0, 76.2),
        (-31.75, 0, 76.2),
        (-31.75, 0, 0),
    ]]
    chamfer(f9_edges, length=F9_SIZE)

    # F10
    f10_edges = [f1_20.edges().sort_by_distance(p)[0] for p in [
        (-26.9875, 0, 0),
    ]]
    chamfer(f10_edges, length=F10_SIZE)


solid = f1_20.part
